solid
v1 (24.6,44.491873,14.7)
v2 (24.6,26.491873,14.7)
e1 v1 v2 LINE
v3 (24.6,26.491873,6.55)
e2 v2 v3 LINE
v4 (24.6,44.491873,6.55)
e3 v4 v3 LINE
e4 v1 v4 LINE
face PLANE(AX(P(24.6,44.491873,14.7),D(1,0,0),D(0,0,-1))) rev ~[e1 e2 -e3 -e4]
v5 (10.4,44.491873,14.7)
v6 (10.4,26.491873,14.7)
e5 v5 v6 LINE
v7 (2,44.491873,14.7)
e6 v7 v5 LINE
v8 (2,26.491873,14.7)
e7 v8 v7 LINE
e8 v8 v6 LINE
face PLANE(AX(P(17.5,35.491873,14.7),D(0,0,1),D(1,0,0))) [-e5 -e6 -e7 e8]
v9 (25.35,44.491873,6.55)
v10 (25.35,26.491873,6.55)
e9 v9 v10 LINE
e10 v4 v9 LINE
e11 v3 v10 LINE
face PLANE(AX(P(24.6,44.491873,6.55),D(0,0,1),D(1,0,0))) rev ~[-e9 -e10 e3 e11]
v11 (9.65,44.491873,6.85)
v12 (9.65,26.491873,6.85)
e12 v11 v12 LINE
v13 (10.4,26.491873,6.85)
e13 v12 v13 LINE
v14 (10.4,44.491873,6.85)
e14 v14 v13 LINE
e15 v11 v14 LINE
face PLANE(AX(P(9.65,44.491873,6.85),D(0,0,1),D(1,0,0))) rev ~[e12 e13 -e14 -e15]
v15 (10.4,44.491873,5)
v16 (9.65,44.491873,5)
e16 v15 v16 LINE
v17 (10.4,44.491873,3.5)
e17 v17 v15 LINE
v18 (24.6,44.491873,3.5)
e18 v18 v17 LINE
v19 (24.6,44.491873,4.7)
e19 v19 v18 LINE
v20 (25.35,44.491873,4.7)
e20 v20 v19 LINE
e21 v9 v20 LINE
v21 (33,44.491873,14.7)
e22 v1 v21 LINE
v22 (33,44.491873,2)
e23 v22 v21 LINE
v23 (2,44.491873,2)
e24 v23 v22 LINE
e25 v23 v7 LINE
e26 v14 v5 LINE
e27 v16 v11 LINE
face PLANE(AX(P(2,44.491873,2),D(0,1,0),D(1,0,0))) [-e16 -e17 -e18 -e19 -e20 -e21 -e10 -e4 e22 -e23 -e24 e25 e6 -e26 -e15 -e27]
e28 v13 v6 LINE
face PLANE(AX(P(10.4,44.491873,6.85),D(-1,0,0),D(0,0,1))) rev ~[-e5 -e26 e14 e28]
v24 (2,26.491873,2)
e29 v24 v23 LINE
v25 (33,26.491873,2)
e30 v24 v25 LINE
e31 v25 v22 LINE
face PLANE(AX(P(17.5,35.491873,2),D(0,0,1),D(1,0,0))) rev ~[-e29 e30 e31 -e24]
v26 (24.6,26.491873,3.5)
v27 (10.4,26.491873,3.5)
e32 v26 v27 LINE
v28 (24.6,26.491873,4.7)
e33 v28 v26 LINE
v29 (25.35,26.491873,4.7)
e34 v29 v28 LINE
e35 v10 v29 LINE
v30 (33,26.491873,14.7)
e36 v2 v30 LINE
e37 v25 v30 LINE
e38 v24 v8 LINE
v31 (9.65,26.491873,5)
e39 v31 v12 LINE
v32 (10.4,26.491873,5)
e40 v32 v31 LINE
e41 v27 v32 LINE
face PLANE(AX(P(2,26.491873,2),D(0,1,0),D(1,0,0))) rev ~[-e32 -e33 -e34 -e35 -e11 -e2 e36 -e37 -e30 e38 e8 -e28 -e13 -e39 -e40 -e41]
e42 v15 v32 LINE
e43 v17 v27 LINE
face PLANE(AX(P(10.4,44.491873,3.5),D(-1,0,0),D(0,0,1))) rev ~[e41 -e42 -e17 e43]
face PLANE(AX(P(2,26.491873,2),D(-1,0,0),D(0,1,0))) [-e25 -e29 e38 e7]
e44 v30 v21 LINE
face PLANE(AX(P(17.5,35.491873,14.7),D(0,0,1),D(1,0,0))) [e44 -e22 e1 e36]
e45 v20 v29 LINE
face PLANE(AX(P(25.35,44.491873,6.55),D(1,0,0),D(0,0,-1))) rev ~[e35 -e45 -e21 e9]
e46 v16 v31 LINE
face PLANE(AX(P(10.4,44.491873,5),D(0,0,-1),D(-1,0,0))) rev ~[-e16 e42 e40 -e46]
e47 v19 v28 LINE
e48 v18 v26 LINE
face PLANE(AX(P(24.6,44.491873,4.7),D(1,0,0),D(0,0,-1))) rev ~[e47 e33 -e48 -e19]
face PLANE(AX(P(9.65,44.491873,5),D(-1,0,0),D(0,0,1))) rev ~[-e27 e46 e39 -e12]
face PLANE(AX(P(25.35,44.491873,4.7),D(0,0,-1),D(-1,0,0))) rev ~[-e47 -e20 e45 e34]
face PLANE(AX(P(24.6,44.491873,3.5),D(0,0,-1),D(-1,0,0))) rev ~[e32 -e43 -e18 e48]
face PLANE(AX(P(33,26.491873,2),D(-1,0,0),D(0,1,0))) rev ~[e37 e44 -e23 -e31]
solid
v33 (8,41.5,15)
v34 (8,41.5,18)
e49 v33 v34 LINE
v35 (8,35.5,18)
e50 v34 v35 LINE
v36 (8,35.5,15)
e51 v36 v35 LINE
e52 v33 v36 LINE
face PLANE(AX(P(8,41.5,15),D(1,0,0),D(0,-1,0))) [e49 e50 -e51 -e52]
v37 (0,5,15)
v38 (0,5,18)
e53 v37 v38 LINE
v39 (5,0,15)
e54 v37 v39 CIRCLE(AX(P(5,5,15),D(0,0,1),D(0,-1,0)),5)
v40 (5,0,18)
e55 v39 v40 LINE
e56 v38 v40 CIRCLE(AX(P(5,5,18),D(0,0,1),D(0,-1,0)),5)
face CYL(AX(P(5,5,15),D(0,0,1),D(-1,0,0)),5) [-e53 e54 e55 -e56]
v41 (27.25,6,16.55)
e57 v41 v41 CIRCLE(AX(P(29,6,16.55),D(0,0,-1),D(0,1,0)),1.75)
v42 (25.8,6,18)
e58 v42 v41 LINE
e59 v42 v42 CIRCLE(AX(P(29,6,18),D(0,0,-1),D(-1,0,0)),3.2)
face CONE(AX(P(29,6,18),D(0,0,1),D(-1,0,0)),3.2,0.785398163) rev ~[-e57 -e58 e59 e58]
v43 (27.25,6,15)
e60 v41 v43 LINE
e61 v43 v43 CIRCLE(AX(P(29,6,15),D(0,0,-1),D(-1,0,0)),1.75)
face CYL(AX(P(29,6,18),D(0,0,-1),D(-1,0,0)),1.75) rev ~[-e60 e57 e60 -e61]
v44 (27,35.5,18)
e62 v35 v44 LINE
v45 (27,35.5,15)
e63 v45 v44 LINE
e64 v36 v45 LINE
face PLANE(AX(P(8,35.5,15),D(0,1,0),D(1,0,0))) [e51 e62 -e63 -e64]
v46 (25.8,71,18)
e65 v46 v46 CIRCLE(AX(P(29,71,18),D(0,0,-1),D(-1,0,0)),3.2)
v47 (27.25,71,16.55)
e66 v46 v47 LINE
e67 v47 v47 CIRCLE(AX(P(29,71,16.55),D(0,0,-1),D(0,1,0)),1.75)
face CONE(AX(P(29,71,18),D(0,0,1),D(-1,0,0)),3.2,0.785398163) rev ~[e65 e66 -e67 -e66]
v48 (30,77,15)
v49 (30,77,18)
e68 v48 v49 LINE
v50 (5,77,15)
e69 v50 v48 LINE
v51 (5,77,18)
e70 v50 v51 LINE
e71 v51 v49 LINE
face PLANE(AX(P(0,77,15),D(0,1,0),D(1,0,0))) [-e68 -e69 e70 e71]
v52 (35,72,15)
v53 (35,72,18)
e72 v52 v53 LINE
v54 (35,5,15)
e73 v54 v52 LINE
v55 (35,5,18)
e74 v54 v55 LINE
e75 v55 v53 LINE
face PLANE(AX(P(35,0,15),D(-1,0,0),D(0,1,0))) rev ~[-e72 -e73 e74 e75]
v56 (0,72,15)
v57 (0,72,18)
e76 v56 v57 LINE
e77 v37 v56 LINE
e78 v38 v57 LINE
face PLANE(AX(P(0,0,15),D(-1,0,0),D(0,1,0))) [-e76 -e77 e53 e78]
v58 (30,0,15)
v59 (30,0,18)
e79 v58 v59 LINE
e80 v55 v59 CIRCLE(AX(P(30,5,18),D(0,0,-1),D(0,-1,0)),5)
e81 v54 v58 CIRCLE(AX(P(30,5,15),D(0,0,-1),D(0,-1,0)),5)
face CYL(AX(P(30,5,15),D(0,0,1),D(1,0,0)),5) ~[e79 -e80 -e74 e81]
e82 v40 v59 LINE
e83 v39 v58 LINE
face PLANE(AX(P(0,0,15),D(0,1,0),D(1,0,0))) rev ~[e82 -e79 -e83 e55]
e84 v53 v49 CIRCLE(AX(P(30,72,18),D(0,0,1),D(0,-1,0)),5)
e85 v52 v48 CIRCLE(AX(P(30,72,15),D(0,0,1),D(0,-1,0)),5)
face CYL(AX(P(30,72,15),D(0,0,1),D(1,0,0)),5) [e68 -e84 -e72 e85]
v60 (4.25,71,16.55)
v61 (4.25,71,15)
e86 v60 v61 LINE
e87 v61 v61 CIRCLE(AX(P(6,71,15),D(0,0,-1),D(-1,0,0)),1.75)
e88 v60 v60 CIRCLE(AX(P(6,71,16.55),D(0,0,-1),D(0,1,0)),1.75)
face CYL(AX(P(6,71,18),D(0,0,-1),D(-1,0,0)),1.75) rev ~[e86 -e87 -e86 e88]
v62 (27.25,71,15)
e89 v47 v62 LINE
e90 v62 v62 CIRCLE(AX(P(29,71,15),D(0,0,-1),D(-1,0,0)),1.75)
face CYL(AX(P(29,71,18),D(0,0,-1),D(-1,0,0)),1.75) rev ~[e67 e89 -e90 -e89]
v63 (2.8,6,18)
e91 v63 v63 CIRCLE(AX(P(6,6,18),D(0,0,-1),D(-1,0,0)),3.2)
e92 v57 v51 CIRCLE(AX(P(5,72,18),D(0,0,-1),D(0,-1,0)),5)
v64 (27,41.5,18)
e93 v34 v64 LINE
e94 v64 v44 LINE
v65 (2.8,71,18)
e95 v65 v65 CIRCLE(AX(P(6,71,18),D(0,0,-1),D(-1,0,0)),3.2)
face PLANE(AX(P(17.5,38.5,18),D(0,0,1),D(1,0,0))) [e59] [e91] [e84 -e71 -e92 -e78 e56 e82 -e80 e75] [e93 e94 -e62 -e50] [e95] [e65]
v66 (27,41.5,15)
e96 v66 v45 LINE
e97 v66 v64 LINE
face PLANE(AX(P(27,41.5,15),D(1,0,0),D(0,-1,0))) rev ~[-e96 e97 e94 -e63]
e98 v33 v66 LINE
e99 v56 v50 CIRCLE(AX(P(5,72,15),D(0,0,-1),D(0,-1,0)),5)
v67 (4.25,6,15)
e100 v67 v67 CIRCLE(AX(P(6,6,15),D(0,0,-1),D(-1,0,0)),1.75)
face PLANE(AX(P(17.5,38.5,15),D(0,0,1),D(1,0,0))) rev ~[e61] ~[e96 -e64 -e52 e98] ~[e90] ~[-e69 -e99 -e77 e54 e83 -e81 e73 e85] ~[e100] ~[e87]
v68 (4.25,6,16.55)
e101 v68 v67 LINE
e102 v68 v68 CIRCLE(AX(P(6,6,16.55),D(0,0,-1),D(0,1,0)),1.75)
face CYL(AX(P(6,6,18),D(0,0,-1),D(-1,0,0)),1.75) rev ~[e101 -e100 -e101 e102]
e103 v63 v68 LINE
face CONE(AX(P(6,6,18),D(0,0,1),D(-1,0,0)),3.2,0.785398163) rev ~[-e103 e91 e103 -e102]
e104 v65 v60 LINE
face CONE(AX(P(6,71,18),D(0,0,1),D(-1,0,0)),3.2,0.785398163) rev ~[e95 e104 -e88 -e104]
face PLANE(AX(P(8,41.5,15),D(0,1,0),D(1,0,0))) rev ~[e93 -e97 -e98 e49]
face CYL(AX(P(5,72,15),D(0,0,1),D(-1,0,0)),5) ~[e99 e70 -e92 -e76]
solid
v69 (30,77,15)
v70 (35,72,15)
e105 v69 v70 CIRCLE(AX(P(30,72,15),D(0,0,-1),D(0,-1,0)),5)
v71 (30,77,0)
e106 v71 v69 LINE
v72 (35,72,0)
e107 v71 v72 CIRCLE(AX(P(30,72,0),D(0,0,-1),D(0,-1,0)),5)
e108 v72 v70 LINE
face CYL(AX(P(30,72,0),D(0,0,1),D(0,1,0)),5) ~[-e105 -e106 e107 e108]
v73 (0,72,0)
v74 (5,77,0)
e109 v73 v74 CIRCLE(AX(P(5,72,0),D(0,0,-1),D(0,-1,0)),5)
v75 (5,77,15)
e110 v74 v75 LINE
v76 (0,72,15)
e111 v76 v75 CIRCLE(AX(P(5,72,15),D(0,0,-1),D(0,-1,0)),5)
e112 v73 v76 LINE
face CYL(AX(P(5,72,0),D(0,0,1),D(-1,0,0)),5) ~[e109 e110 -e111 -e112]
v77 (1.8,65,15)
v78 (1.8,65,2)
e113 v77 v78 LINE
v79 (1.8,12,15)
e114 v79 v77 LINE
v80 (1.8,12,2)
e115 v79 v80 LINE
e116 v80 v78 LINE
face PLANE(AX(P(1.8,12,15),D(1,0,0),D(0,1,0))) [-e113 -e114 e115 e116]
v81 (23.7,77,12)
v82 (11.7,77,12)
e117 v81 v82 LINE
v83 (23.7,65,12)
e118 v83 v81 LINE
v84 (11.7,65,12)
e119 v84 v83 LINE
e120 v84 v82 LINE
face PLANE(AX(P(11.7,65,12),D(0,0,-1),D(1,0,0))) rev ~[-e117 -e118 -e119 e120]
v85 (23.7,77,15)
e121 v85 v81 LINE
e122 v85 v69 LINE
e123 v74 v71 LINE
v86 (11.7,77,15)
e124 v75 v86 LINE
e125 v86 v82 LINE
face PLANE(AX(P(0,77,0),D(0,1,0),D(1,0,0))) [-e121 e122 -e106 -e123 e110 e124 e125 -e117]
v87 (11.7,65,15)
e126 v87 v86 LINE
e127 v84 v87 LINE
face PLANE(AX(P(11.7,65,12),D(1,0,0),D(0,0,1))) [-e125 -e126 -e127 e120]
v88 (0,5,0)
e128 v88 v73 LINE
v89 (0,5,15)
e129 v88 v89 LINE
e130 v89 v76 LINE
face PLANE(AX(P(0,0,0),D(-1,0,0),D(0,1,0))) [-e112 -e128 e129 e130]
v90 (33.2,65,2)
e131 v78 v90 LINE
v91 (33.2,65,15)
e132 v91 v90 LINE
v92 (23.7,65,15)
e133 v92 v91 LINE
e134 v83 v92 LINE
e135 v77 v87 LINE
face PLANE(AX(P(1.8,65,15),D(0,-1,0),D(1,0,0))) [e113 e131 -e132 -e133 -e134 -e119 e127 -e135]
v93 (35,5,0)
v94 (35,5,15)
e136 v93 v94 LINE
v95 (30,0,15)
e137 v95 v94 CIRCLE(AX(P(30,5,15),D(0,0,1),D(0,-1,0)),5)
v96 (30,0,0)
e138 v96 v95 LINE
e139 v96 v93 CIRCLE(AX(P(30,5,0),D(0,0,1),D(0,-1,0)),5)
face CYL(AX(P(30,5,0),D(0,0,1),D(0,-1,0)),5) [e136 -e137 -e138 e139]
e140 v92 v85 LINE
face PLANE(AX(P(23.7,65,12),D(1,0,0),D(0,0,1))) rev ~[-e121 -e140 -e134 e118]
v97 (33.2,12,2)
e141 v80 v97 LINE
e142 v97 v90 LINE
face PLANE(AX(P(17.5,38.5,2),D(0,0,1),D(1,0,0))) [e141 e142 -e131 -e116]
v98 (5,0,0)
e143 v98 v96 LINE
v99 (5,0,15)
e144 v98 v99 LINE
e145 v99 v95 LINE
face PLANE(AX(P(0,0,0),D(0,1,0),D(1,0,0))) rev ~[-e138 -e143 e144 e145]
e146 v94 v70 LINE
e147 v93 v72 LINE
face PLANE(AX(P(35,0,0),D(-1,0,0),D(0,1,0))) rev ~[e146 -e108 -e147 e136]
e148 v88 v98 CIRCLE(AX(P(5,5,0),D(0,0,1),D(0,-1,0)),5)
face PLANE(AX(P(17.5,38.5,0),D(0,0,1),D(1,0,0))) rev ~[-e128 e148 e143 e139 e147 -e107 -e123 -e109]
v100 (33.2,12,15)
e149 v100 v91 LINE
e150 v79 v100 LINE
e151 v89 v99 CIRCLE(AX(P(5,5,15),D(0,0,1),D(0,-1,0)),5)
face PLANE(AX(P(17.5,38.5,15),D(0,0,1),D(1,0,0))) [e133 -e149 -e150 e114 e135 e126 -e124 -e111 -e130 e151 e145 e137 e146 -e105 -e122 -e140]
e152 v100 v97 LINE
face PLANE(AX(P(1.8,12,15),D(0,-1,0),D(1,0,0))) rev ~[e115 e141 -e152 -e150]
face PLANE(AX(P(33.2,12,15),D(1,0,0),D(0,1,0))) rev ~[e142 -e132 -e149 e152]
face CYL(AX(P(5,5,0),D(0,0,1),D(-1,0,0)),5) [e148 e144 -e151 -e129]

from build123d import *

# Parameters (mm, degrees)
F0_W            = 35
F0_H            = 77
F1_DEPTH        = 15
F2_W            = 31.4
F2_H            = 53
F3_DEPTH        = 13
F4_W            = 12
F4_H            = 3
F5_DEPTH        = 25
F7_W            = 35
F7_H            = 77
F8_DEPTH        = 3
F11_D           = 3.5
F11_CSINK_D     = 6.4
F11_CSINK_ANGLE = 90
F12_R           = 5
F12_2_R         = 5
F13_W           = 31
F13_H           = 18
F14_DEPTH       = 12.7
F16_DEPTH       = 18
F9_W            = 19
F9_H            = 6
F17_DEPTH       = 3


# Not quite as in the source:
# - a feature names something its author has since deleted; it is built from what else it names


with BuildPart() as f1:
    # F0 (on Top) → F1 (new body)
    with BuildSketch(Plane.XY):
        with Locations((17.5, 38.5)):
            Rectangle(F0_W, F0_H)
    extrude(amount=F1_DEPTH)

    # F2 (on face) → F3 (cut)
    with BuildSketch(Plane.XY.offset(15)):
        with Locations((17.5, 38.5)):
            Rectangle(F2_W, F2_H)
    extrude(amount=-F3_DEPTH, mode=Mode.SUBTRACT)

    # F4 (on face) → F5 (cut)
    with BuildSketch(Plane.XZ.offset(-65)):
        with Locations((17.7, 13.5)):
            Rectangle(F4_W, F4_H)
    extrude(amount=-F5_DEPTH, mode=Mode.SUBTRACT)

    # F12
    f12_edges = [f1.edges().sort_by_distance(p)[0] for p in [
        (35, 77, 7.5),
        (0, 77, 7.5),
        (35, 0, 7.5),
        (0, 0, 7.5),
    ]]
    fillet(f12_edges, radius=F12_R)


with BuildPart() as f8:
    # F7 (on face) → F8 (new body)
    with BuildSketch(Plane.XY.offset(15)):
        with Locations((17.5, 38.5)):
            Rectangle(F7_W, F7_H)
    extrude(amount=F8_DEPTH)

    # F11 (through all)
    with Locations(Plane.XY.offset(18)):
        with Locations((6, 71), (29, 71), (29, 6), (6, 6)):
            CounterSinkHole(F11_D / 2, F11_CSINK_D / 2, counter_sink_angle=F11_CSINK_ANGLE)

    # F12#2
    f12_2_edges = [f8.edges().sort_by_distance(p)[0] for p in [
        (35, 77, 16.5),
        (0, 77, 16.5),
        (35, 0, 16.5),
        (0, 0, 16.5),
    ]]
    fillet(f12_2_edges, radius=F12_2_R)

    # F9 (on face) → F17 (cut, through all)
    with BuildSketch(Plane(origin=(0, 0, 15), x_dir=(1, 0, 0), z_dir=(0, 0, -1))):
        with Locations((17.5, -38.5)):
            Rectangle(F9_W, F9_H)
    extrude(amount=-F17_DEPTH, mode=Mode.SUBTRACT)


with BuildPart() as f14:
    # F13 (on face) → F14 (new body, through all)
    with BuildSketch(Plane.XY.offset(2)):
        with Locations((17.5, 35.4918729663)):
            Rectangle(F13_W, F13_H)
    extrude(amount=F14_DEPTH)

    # F15 (on face) → F16 (cut, through all)
    with BuildSketch(Plane(origin=(0, 44.4918729663, 0), x_dir=(-1, 0, 0), z_dir=(0, 1, 0))):
        Polygon((-24.6, 14.7), (-24.6, 10), (-24.6, 6.55), (-25.35, 6.55), (-25.35, 4.7), (-24.6, 4.7), (-24.6, 3.5), (-10.4, 3.5), (-10.4, 5), (-9.65, 5), (-9.65, 6.85), (-10.4, 6.85), (-10.4, 10), (-10.4, 14.7), align=None)
    extrude(amount=-F16_DEPTH, mode=Mode.SUBTRACT)


solid = Compound([f1.part, f8.part, f14.part])
